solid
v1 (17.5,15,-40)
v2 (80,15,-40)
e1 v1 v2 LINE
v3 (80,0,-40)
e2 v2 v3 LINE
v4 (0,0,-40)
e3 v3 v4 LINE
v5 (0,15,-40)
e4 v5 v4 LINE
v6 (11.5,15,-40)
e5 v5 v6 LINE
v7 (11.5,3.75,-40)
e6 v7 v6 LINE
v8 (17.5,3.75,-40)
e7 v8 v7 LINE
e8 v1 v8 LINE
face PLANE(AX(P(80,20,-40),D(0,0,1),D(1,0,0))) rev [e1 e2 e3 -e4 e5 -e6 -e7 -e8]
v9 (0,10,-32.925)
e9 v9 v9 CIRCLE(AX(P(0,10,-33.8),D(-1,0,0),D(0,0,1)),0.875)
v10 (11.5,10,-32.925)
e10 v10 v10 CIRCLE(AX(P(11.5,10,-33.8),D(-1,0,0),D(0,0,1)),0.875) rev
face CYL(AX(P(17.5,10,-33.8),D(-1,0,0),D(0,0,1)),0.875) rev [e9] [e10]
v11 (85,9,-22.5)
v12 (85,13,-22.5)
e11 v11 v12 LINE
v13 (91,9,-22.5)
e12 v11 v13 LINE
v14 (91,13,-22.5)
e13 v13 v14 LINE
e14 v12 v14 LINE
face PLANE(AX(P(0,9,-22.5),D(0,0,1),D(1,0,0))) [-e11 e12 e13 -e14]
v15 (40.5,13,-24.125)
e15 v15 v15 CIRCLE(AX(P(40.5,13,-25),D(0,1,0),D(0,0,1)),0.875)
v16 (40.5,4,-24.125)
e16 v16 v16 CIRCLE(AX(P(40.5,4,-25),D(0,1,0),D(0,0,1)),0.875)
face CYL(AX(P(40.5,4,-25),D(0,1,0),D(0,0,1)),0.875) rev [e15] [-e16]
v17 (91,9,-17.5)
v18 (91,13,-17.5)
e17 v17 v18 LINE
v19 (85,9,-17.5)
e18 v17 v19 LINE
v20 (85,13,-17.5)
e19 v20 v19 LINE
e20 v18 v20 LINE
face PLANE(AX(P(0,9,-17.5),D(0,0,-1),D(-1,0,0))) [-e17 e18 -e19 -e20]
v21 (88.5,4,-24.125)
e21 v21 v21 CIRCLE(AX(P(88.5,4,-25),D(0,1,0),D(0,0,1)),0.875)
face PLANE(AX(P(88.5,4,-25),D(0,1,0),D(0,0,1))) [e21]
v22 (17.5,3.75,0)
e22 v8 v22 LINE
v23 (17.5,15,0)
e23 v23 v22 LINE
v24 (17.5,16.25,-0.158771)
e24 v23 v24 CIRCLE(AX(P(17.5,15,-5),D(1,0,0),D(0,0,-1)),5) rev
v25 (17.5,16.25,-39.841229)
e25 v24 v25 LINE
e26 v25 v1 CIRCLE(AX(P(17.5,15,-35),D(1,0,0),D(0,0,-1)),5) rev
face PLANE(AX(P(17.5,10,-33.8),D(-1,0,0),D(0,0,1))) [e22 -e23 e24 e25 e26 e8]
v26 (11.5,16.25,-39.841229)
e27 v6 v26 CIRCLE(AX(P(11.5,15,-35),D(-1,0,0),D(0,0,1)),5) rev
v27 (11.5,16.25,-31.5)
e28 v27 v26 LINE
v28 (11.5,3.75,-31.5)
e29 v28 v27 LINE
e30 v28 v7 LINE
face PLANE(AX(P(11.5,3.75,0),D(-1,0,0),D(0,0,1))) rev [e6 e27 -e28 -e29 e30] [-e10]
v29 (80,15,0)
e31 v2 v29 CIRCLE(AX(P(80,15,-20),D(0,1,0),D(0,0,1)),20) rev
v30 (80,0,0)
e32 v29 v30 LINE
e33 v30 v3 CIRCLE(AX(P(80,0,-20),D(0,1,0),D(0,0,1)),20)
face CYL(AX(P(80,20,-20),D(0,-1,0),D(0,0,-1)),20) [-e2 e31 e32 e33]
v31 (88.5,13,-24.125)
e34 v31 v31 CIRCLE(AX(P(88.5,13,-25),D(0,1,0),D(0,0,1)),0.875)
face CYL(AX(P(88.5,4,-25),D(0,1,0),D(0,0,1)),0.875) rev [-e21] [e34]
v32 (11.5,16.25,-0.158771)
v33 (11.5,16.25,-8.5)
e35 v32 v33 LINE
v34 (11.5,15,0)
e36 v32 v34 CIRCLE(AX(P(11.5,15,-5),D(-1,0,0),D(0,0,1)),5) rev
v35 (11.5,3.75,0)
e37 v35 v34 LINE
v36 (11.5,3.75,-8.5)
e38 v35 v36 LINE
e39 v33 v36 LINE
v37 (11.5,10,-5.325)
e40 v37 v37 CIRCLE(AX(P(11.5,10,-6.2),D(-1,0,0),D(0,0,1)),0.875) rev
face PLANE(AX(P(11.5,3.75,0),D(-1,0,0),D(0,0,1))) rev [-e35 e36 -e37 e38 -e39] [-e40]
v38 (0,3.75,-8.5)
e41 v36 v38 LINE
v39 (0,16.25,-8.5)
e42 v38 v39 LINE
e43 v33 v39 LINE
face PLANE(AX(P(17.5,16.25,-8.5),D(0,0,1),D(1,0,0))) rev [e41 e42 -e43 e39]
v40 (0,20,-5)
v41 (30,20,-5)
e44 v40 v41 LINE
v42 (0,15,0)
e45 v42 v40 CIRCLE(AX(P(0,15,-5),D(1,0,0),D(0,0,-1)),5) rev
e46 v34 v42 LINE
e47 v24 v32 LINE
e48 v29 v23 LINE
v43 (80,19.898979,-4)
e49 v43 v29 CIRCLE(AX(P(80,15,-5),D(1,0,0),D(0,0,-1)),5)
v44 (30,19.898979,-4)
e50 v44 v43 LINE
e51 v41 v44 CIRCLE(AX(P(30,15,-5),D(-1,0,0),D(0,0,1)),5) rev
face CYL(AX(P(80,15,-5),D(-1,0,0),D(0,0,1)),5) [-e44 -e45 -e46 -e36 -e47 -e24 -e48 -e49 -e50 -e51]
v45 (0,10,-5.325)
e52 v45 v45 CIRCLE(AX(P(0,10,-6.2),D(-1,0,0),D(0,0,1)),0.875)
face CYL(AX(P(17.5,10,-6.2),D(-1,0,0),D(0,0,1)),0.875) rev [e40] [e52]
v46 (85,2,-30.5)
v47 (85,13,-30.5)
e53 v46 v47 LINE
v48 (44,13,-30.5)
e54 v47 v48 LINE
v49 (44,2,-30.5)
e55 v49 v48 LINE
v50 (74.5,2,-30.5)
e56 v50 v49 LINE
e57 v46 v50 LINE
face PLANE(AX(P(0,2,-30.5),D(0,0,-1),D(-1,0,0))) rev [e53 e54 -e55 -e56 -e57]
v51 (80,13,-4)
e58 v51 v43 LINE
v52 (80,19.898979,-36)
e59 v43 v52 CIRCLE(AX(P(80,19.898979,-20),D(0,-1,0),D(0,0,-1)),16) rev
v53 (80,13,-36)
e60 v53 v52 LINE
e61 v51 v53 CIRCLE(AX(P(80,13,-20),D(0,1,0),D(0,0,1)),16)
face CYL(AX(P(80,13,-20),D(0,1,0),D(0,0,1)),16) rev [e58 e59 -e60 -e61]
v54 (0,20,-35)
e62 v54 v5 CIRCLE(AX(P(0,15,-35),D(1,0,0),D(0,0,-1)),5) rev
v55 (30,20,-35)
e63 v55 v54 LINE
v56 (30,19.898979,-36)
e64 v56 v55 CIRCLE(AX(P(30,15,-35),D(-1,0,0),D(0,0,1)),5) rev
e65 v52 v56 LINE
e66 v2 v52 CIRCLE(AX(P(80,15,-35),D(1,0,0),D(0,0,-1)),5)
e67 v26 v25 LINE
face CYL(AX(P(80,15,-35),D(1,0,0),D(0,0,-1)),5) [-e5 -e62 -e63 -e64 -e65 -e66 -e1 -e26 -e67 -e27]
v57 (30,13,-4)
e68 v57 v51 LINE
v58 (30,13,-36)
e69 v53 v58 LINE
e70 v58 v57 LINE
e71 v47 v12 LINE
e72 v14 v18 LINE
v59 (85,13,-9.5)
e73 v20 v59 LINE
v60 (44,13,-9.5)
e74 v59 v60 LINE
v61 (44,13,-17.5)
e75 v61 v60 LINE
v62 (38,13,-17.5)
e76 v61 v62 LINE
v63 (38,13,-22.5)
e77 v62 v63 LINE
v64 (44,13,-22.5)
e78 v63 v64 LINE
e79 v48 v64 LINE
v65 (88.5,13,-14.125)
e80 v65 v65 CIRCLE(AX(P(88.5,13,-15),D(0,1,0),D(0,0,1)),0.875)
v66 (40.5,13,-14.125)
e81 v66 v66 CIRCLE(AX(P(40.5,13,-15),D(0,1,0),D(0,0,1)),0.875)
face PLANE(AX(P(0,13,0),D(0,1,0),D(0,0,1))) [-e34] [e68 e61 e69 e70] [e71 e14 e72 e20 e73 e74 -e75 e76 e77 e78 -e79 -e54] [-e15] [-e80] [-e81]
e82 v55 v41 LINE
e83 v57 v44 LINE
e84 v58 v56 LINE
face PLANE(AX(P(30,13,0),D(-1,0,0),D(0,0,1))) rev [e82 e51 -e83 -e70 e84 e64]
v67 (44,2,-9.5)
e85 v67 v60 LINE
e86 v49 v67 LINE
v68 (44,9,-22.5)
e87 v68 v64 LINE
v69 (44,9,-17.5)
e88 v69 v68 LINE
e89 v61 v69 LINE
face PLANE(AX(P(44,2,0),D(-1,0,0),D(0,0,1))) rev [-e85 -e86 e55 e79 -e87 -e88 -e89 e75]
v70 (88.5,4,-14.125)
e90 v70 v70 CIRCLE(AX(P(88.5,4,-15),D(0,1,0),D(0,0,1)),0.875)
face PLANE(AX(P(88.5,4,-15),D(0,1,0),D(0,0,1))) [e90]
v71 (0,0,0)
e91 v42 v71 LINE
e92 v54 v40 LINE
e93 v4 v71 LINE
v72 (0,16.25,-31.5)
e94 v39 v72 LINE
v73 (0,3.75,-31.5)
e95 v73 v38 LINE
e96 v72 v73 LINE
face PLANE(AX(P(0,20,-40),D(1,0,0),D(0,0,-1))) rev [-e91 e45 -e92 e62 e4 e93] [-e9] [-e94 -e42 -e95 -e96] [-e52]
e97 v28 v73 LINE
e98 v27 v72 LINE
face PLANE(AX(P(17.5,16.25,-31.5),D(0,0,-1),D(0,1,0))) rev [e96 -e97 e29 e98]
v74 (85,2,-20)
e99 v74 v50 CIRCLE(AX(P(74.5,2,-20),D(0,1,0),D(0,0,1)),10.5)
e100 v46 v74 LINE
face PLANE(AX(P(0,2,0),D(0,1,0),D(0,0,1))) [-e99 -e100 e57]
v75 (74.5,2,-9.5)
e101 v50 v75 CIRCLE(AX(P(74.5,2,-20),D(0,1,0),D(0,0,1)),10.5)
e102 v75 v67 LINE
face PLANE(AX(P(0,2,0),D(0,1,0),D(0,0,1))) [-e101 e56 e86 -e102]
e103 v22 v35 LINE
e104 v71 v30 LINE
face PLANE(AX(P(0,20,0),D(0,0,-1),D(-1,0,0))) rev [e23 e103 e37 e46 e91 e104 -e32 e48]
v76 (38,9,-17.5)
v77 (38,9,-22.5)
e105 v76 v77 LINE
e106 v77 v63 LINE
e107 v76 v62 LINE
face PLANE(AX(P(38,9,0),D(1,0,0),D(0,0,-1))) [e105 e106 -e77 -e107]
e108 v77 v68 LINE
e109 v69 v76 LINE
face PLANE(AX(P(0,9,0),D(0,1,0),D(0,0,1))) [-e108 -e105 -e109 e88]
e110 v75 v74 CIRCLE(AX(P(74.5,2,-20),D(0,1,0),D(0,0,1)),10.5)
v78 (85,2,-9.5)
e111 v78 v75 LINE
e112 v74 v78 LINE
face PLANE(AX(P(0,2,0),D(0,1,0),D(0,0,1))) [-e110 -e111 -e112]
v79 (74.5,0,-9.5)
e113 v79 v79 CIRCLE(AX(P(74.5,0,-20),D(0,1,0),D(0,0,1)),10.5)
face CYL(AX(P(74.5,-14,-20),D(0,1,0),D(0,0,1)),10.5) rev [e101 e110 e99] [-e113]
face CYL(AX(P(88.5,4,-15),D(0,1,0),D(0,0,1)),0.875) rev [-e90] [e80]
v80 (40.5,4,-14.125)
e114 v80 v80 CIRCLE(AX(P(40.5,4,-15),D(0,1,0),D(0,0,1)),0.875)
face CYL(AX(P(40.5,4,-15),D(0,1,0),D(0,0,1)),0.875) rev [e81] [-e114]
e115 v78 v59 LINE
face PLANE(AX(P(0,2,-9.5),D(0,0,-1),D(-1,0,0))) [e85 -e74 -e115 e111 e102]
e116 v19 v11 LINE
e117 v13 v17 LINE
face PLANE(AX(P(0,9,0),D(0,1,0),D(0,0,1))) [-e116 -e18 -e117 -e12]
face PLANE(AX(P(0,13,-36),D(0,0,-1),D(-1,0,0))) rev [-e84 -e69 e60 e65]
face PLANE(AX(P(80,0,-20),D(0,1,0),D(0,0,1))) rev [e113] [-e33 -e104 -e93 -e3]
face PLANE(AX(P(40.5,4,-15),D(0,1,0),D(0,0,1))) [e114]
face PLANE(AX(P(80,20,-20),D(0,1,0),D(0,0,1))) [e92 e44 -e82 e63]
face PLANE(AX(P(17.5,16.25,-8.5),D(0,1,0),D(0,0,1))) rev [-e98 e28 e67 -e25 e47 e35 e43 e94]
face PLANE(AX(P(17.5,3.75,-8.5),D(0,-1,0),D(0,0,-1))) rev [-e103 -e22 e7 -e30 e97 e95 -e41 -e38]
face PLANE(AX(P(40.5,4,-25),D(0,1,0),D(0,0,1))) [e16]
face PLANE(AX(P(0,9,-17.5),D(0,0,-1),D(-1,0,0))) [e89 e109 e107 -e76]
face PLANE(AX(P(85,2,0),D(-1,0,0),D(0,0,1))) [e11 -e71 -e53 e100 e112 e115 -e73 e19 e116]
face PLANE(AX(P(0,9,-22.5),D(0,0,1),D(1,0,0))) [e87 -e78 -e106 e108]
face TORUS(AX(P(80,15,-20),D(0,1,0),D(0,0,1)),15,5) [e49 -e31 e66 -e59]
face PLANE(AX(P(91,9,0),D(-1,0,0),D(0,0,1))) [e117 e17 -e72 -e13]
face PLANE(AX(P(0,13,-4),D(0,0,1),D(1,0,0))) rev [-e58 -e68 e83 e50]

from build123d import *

# Parameters (mm, degrees)
BOSS_EXTRUDE1_DEPTH     = 20
SKETCH2_R               = 0.875
SKETCH2_W               = 41
SKETCH2_H               = 21
CUT_EXTRUDE2_DEPTH      = 7
SKETCH2_7_W             = 41
SKETCH2_7_H             = 10
SKETCH2_7_H_2           = 5.5
CUT_EXTRUDE3_DEPTH      = 18
SKETCH2_8_R             = 0.875
CUT_EXTRUDE4_DEPTH      = 16
SKETCH5_R               = 10.5
CUT_EXTRUDE5_DEPTH      = 16
SKETCH6_R               = 0.875
SKETCH6_W               = 23
SKETCH6_H               = 12.5
CUT_EXTRUDE6_DEPTH      = 17.5
FILLET1_R               = 5
SKETCH7_W               = 6
SKETCH7_H               = 5
SKETCH7_H_2             = 2.5
CUT_EXTRUDE7_DEPTH      = 4
CUT_EXTRUDE8_DEPTH      = 107.73448365
CUT_EXTRUDE8_DEPTH_BACK = 107.73448365
SKETCH8_W               = 6
SKETCH8_H               = 12.5


with BuildPart() as part:
    # Sketch1 → Boss-Extrude1 (new body)
    with BuildSketch(Plane(origin=(0, 0, 0), x_dir=(1, 0, 0), z_dir=(0, 1, 0))):
        with BuildLine():
            Line((0, 40), (0, 0))
            Line((0, 0), (80, 0))
            ThreePointArc((80, 0), (100, 20), (80, 40))
            Line((80, 40), (0, 40))
        make_face()
    extrude(amount=BOSS_EXTRUDE1_DEPTH)

    # Sketch2 → Cut-Extrude2 (cut)
    with BuildSketch(Plane(origin=(0, 20, 0), x_dir=(1, 0, 0), z_dir=(0, 1, 0))):
        with BuildLine():
            Line((30, 36), (30, 4))
            Line((30, 4), (80, 4))
            ThreePointArc((80, 4), (96, 20), (80, 36))
            Line((80, 36), (30, 36))
        make_face()
        with Locations(Location((40.5, 25, 0), (0, 0, 270))):
            Circle(SKETCH2_R, mode=Mode.SUBTRACT)
        with Locations(Location((40.5, 15, 0), (0, 0, 270))):
            Circle(SKETCH2_R, mode=Mode.SUBTRACT)
        with Locations(Location((88.5, 25, 0), (0, 0, 270))):
            Circle(SKETCH2_R, mode=Mode.SUBTRACT)
        with Locations(Location((88.5, 15, 0), (0, 0, 270))):
            Circle(SKETCH2_R, mode=Mode.SUBTRACT)
        with Locations((64.5, 20)):
            Rectangle(SKETCH2_W, SKETCH2_H, mode=Mode.SUBTRACT)
    extrude(amount=-CUT_EXTRUDE2_DEPTH, mode=Mode.SUBTRACT)

    # Sketch2<7> → Cut-Extrude3 (cut)
    with BuildSketch(Plane(origin=(0, 20, 0), x_dir=(1, 0, 0), z_dir=(0, 1, 0))):
        with Locations((64.5, 20)):
            Rectangle(SKETCH2_7_W, SKETCH2_7_H)
        with Locations((64.5, 12.25)):
            Rectangle(SKETCH2_7_W, SKETCH2_7_H_2)
        with Locations((64.5, 27.75)):
            Rectangle(SKETCH2_7_W, SKETCH2_7_H_2)
    extrude(amount=-CUT_EXTRUDE3_DEPTH, mode=Mode.SUBTRACT)

    # Sketch2<8> → Cut-Extrude4 (cut)
    with BuildSketch(Plane(origin=(0, 20, 0), x_dir=(1, 0, 0), z_dir=(0, 1, 0))):
        with Locations(Location((40.5, 25, 0), (0, 0, 270))):
            Circle(SKETCH2_8_R)
        with Locations(Location((40.5, 15, 0), (0, 0, 270))):
            Circle(SKETCH2_8_R)
        with Locations(Location((88.5, 25, 0), (0, 0, 270))):
            Circle(SKETCH2_8_R)
        with Locations(Location((88.5, 15, 0), (0, 0, 270))):
            Circle(SKETCH2_8_R)
    extrude(amount=-CUT_EXTRUDE4_DEPTH, mode=Mode.SUBTRACT)

    # Sketch5 → Cut-Extrude5 (cut)
    with BuildSketch(Plane(origin=(0, 2, 0), x_dir=(1, 0, 0), z_dir=(0, 1, 0))):
        with Locations(Location((74.5, 20, 0), (0, 0, 270))):
            Circle(SKETCH5_R)
    extrude(amount=-CUT_EXTRUDE5_DEPTH, mode=Mode.SUBTRACT)

    # Sketch6 → Cut-Extrude6 (cut)
    with BuildSketch(Plane.ZY):
        with Locations((-6.2, 10)):
            Circle(SKETCH6_R)
        with Locations((-33.8, 10)):
            Circle(SKETCH6_R)
        with Locations((-20, 10)):
            Rectangle(SKETCH6_W, SKETCH6_H)
    extrude(amount=-CUT_EXTRUDE6_DEPTH, mode=Mode.SUBTRACT)

    # Fillet1
    # the kernel refuses this fillet: 5 mm, written as the material it takes off along each edge
    with BuildSketch(Plane(origin=(80, 20, -40), x_dir=(0, -1, 0), z_dir=(-1, 0, 0))) as fillet1_piece_1:
        with BuildLine():
            CenterArc((FILLET1_R, FILLET1_R), FILLET1_R, 180, 90)
            Line((0, FILLET1_R), (0, 0))
            Line((0, 0), (FILLET1_R, 0))
        make_face()
    extrude(amount=92.5, mode=Mode.SUBTRACT)
    with BuildSketch(Plane(origin=(-12.5, 20, 0), x_dir=(0, 0, -1), z_dir=(1, 0, 0))) as fillet1_piece_2:
        with BuildLine():
            CenterArc((FILLET1_R, -FILLET1_R), FILLET1_R, 90, 90)
            Line((0, -FILLET1_R), (0, 0))
            Line((0, 0), (FILLET1_R, 0))
        make_face()
    extrude(amount=92.5, mode=Mode.SUBTRACT)
    with BuildSketch(Plane(origin=(80, 20, -20), x_dir=(0, 0, 1), z_dir=(-1, 0, 0))) as fillet1_piece_3:
        with BuildLine():
            CenterArc((20 - FILLET1_R, -FILLET1_R), FILLET1_R, 0, 90)
            Line((20 - FILLET1_R, 0), (20, 0))
            Line((20, 0), (20, -FILLET1_R))
        make_face()
    revolve(axis=Axis((80, 20, -20), (0, 1, 0)), revolution_arc=180, mode=Mode.SUBTRACT)

    # Sketch7 → Cut-Extrude7 (cut)
    with BuildSketch(Plane(origin=(0, 13, 0), x_dir=(1, 0, 0), z_dir=(0, 1, 0))):
        Polygon((85, 17.5), (85, 20), (85, 22.5), (44, 22.5), (44, 17.5), align=None)
        with Locations((41, 20)):
            Rectangle(SKETCH7_W, SKETCH7_H)
        with Locations((88, 18.75)):
            Rectangle(SKETCH7_W, SKETCH7_H_2)
        with Locations((88, 21.25)):
            Rectangle(SKETCH7_W, SKETCH7_H_2)
    extrude(amount=-CUT_EXTRUDE7_DEPTH, mode=Mode.SUBTRACT)

    # Sketch8 → Cut-Extrude8 (cut, two sides: drawn at the far end of the back side and taken through both)
    with BuildSketch(Plane(origin=(0, 0, -8.5), x_dir=(-1, 0, 0), z_dir=(0, 0, -1)).offset(-CUT_EXTRUDE8_DEPTH_BACK)):
        with Locations((-14.5, 10)):
            Rectangle(SKETCH8_W, SKETCH8_H)
    extrude(amount=CUT_EXTRUDE8_DEPTH + CUT_EXTRUDE8_DEPTH_BACK, mode=Mode.SUBTRACT)


solid = part.part
